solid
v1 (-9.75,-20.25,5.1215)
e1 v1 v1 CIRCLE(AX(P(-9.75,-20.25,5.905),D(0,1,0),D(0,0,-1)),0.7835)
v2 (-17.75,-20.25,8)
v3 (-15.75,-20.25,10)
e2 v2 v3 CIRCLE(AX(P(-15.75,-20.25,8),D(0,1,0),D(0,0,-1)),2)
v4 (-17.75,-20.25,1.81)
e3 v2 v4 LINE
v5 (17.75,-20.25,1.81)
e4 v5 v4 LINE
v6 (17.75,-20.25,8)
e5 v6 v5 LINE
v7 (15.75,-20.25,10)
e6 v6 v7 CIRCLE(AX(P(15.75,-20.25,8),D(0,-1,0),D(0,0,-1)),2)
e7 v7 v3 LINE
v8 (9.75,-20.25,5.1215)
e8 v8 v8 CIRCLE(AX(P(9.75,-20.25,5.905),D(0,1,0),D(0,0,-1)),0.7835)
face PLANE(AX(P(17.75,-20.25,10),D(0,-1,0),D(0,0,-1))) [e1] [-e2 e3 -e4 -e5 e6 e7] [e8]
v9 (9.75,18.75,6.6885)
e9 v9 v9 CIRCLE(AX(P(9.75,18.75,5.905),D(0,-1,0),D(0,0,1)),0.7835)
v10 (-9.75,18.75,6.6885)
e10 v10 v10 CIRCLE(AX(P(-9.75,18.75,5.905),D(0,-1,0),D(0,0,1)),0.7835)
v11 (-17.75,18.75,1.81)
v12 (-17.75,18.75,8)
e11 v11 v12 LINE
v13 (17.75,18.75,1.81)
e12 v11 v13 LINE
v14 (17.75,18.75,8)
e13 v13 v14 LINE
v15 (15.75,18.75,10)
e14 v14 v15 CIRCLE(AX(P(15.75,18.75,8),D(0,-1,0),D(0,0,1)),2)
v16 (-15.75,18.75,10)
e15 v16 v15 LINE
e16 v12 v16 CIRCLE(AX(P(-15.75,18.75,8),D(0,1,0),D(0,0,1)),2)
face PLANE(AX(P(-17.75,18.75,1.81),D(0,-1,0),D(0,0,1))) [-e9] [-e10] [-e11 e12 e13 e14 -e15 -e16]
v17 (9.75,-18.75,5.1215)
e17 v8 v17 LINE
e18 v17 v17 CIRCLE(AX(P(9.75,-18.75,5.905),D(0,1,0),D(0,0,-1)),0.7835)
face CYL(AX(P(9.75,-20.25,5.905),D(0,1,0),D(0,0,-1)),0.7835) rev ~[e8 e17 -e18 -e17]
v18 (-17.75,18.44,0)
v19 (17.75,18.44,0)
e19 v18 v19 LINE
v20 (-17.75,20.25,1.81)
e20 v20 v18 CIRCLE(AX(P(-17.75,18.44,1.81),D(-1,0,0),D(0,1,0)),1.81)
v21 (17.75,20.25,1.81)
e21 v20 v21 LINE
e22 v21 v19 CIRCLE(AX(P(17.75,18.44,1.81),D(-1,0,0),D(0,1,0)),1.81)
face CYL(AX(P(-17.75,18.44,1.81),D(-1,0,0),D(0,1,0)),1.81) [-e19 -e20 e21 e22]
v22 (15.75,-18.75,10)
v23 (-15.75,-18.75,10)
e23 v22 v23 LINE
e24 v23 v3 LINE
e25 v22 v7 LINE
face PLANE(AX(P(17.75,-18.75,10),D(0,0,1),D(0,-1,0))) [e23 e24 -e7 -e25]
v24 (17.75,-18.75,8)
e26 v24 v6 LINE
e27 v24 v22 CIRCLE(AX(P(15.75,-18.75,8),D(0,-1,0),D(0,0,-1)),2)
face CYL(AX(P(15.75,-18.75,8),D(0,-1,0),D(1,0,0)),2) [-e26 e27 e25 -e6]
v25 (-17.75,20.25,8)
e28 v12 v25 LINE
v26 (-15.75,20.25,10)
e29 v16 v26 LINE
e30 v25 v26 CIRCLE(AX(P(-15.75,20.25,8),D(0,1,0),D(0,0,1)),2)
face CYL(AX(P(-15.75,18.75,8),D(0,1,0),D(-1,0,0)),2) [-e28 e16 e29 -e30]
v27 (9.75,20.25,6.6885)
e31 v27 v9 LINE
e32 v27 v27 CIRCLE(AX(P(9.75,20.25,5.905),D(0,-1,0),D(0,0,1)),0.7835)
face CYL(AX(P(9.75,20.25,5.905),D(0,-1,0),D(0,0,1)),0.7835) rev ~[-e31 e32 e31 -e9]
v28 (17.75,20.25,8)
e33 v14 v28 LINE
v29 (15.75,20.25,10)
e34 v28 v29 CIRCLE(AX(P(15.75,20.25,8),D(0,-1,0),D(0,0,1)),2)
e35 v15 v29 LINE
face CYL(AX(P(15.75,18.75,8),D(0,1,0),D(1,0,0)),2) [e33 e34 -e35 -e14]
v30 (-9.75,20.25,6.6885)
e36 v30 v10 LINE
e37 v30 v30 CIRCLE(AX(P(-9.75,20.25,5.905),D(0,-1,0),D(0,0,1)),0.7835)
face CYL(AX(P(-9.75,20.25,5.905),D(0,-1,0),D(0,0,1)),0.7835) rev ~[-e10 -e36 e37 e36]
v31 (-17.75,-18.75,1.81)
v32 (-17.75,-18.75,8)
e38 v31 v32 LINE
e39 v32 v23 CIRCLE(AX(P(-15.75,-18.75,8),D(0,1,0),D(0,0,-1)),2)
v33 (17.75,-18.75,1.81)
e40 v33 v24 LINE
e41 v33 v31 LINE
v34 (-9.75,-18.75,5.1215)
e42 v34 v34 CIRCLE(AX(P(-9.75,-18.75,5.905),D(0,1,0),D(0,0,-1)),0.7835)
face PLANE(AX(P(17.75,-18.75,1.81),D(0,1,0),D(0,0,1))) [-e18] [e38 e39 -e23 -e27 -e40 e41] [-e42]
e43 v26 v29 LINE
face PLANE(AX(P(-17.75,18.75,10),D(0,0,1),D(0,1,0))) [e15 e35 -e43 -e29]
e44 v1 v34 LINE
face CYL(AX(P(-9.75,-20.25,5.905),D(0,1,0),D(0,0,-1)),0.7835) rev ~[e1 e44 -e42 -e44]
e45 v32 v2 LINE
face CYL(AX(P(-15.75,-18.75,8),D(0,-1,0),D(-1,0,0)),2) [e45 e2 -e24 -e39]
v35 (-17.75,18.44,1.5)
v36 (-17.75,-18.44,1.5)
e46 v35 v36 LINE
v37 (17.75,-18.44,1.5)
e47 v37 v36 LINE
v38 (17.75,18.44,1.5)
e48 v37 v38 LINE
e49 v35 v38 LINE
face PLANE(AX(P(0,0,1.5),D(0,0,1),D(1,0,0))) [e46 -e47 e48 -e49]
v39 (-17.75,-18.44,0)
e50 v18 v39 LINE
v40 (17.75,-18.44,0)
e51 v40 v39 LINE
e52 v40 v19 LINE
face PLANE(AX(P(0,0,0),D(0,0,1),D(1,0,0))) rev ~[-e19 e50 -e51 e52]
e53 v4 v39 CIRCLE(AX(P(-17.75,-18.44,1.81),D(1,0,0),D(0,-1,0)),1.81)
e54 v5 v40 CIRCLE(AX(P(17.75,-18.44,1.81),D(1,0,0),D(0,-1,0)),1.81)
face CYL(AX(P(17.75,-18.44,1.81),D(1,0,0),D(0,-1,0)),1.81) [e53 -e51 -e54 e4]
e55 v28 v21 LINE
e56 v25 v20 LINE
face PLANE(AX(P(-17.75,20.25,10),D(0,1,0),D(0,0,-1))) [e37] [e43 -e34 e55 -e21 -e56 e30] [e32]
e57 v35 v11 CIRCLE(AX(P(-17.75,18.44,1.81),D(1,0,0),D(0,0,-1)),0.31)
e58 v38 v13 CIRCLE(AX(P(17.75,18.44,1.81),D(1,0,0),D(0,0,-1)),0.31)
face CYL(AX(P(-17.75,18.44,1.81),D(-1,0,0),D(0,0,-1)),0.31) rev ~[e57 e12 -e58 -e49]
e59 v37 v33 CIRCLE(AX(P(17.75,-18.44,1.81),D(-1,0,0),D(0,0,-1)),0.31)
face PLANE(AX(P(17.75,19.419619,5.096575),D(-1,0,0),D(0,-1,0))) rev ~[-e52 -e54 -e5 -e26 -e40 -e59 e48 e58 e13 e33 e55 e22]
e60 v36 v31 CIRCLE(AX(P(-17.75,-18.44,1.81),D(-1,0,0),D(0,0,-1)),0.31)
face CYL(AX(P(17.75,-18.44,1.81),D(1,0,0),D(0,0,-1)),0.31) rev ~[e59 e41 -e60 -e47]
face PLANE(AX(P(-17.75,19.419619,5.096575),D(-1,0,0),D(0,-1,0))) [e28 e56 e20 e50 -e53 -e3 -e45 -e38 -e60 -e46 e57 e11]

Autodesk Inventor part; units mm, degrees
ref_plane "YZ Plane" through (0, 0, 0) normal (1, 0, 0) x (0, 1, 0)
ref_plane "XZ Plane" through (0, 0, 0) normal (0, 1, 0) x (-1, 0, 0)
ref_plane "XY Plane" through (0, 0, 0) normal (0, 0, 1) x (1, 0, 0)
sketch "Sketch1" plane through (0, 0, 0) normal (0, 0, 1) x (1, 0, 0)
  line L0 (-17.75, -20.25) -> (17.75, -20.25)
  line L1 (17.75, -20.25) -> (17.75, 20.25)
  line L2 (17.75, 20.25) -> (-17.75, 20.25)
  line L3 (-17.75, 20.25) -> (-17.75, -20.25)
  line L4 (-17.75, -20.25) -> (17.75, 20.25) construction
  line L5 (17.75, -20.25) -> (-17.75, 20.25) construction
  point P0 (0, 0)
  dimension "d0" = 35.5
  dimension "d1" = 40.5
extrude "Plate1" add sketch "Sketch1" along normal blind 1.5
sketch "Sketch2" plane through (-17.75, 18.75, 0) normal (0, 1, 0) x (-1, 0, 0)
  line L0 (-35.5, 0) -> (0, 0)
  line L1 (0, 0) -> (0, 10)
  line L2 (0, 10) -> (-35.5, 10)
  line L3 (-35.5, 10) -> (-35.5, 0)
edge flange "Flange1" height 10 angle 90 thickness 1.5 bend radius 0.31 thickness toward (0, 1, 0) relief tear relief width 1.5 relief depth 0.75 corner gap 0.31 corner form 0 edges at (0, 20.25, 1.5) (0, -20.25, 1.5) wall of the first edge with corners at (17.75, 18.75, 0) (-17.75, 18.75, 0) (-17.75, 18.75, 10) (17.75, 18.75, 10)
bend "Bend1"
corner "Corner1"
sketch "Sketch3" plane through (-17.75, 20.25, 10) normal (0, 1, 0) x (1, 0, 0)
  line L0 (35.5, 8.19) -> (0, 8.19) projected
  line L1 (0, 0) -> (0, 8.19) projected
  line L2 (35.5, 0) -> (0, 0) projected
  line L3 (35.5, 8.19) -> (35.5, 0) projected
  point P0 (17.75, 10)
  point P1 (8, 4.095)
  point P2 (27.5, 4.095)
  point P3 (0, 4.095)
  point P4 (35.5, 4.095)
  dimension "d13" = 8
  dimension "d14" = 8
hole "Hole1" at (-9.75, 20.25, 5.905) at (9.75, 20.25, 5.905) direction (0, -1, 0) diameter 1.567 depth 1.5 thread size "M2x0.4" class "6H" standard "ISO Metric profile"
sketch "Sketch4" plane through (-17.75, -20.25, 10) normal (0, -1, 0) x (1, 0, 0)
  circle A0 centre (27.5, -4.095) radius 0.7835 projected
  circle A1 centre (8, -4.095) radius 0.7835 projected
  point P0 (17.75, -10)
hole "Hole2" at (9.75, -20.25, 5.905) at (-9.75, -20.25, 5.905) direction (0, 1, 0) diameter 1.567 depth 1.5 thread size "M2x0.4" class "6H" standard "ISO Metric profile"
fillet "Corner Round1" radius 2 4 edges at (17.75, 19.5, 10) (-17.75, 19.5, 10) (17.75, -19.5, 10) (-17.75, -19.5, 10)
equation "\"d14\" = d13"
equation "\"d20\" = Thickness"
equation "\"d2\" = Thickness"
equation "\"d3\" = BendReliefWidth"
equation "\"d4\" = BendReliefDepth"
equation "\"d5\" = MinimumRemnant"
equation "\"d6\" = TransitionRadius"
equation "\"d9\" = BendRadius"
equation "\"d10\" = CornerReliefSize"
equation "\"d11\" = GapSize"
equation "\"d12\" = JacobiRadiusSize"
equation "\"BendReliefWidth\" = Thickness"
equation "\"BendReliefDepth\" = 0.5 * Thickness"
equation "\"CornerReliefSize\" = 4 * Thickness"
equation "\"MinimumRemnant\" = 2 * Thickness"
equation "\"TransitionRadius\" = BendRadius"
equation "\"JacobiRadiusSize\" = BendRadius"
equation "\"GapSize\" = Thickness"
equation "\"Thickness\" = 1.5"
equation "\"BendRadius\" = 0.31"
properties part number "ㄷ_frame_3" material "Aluminum 6061"
